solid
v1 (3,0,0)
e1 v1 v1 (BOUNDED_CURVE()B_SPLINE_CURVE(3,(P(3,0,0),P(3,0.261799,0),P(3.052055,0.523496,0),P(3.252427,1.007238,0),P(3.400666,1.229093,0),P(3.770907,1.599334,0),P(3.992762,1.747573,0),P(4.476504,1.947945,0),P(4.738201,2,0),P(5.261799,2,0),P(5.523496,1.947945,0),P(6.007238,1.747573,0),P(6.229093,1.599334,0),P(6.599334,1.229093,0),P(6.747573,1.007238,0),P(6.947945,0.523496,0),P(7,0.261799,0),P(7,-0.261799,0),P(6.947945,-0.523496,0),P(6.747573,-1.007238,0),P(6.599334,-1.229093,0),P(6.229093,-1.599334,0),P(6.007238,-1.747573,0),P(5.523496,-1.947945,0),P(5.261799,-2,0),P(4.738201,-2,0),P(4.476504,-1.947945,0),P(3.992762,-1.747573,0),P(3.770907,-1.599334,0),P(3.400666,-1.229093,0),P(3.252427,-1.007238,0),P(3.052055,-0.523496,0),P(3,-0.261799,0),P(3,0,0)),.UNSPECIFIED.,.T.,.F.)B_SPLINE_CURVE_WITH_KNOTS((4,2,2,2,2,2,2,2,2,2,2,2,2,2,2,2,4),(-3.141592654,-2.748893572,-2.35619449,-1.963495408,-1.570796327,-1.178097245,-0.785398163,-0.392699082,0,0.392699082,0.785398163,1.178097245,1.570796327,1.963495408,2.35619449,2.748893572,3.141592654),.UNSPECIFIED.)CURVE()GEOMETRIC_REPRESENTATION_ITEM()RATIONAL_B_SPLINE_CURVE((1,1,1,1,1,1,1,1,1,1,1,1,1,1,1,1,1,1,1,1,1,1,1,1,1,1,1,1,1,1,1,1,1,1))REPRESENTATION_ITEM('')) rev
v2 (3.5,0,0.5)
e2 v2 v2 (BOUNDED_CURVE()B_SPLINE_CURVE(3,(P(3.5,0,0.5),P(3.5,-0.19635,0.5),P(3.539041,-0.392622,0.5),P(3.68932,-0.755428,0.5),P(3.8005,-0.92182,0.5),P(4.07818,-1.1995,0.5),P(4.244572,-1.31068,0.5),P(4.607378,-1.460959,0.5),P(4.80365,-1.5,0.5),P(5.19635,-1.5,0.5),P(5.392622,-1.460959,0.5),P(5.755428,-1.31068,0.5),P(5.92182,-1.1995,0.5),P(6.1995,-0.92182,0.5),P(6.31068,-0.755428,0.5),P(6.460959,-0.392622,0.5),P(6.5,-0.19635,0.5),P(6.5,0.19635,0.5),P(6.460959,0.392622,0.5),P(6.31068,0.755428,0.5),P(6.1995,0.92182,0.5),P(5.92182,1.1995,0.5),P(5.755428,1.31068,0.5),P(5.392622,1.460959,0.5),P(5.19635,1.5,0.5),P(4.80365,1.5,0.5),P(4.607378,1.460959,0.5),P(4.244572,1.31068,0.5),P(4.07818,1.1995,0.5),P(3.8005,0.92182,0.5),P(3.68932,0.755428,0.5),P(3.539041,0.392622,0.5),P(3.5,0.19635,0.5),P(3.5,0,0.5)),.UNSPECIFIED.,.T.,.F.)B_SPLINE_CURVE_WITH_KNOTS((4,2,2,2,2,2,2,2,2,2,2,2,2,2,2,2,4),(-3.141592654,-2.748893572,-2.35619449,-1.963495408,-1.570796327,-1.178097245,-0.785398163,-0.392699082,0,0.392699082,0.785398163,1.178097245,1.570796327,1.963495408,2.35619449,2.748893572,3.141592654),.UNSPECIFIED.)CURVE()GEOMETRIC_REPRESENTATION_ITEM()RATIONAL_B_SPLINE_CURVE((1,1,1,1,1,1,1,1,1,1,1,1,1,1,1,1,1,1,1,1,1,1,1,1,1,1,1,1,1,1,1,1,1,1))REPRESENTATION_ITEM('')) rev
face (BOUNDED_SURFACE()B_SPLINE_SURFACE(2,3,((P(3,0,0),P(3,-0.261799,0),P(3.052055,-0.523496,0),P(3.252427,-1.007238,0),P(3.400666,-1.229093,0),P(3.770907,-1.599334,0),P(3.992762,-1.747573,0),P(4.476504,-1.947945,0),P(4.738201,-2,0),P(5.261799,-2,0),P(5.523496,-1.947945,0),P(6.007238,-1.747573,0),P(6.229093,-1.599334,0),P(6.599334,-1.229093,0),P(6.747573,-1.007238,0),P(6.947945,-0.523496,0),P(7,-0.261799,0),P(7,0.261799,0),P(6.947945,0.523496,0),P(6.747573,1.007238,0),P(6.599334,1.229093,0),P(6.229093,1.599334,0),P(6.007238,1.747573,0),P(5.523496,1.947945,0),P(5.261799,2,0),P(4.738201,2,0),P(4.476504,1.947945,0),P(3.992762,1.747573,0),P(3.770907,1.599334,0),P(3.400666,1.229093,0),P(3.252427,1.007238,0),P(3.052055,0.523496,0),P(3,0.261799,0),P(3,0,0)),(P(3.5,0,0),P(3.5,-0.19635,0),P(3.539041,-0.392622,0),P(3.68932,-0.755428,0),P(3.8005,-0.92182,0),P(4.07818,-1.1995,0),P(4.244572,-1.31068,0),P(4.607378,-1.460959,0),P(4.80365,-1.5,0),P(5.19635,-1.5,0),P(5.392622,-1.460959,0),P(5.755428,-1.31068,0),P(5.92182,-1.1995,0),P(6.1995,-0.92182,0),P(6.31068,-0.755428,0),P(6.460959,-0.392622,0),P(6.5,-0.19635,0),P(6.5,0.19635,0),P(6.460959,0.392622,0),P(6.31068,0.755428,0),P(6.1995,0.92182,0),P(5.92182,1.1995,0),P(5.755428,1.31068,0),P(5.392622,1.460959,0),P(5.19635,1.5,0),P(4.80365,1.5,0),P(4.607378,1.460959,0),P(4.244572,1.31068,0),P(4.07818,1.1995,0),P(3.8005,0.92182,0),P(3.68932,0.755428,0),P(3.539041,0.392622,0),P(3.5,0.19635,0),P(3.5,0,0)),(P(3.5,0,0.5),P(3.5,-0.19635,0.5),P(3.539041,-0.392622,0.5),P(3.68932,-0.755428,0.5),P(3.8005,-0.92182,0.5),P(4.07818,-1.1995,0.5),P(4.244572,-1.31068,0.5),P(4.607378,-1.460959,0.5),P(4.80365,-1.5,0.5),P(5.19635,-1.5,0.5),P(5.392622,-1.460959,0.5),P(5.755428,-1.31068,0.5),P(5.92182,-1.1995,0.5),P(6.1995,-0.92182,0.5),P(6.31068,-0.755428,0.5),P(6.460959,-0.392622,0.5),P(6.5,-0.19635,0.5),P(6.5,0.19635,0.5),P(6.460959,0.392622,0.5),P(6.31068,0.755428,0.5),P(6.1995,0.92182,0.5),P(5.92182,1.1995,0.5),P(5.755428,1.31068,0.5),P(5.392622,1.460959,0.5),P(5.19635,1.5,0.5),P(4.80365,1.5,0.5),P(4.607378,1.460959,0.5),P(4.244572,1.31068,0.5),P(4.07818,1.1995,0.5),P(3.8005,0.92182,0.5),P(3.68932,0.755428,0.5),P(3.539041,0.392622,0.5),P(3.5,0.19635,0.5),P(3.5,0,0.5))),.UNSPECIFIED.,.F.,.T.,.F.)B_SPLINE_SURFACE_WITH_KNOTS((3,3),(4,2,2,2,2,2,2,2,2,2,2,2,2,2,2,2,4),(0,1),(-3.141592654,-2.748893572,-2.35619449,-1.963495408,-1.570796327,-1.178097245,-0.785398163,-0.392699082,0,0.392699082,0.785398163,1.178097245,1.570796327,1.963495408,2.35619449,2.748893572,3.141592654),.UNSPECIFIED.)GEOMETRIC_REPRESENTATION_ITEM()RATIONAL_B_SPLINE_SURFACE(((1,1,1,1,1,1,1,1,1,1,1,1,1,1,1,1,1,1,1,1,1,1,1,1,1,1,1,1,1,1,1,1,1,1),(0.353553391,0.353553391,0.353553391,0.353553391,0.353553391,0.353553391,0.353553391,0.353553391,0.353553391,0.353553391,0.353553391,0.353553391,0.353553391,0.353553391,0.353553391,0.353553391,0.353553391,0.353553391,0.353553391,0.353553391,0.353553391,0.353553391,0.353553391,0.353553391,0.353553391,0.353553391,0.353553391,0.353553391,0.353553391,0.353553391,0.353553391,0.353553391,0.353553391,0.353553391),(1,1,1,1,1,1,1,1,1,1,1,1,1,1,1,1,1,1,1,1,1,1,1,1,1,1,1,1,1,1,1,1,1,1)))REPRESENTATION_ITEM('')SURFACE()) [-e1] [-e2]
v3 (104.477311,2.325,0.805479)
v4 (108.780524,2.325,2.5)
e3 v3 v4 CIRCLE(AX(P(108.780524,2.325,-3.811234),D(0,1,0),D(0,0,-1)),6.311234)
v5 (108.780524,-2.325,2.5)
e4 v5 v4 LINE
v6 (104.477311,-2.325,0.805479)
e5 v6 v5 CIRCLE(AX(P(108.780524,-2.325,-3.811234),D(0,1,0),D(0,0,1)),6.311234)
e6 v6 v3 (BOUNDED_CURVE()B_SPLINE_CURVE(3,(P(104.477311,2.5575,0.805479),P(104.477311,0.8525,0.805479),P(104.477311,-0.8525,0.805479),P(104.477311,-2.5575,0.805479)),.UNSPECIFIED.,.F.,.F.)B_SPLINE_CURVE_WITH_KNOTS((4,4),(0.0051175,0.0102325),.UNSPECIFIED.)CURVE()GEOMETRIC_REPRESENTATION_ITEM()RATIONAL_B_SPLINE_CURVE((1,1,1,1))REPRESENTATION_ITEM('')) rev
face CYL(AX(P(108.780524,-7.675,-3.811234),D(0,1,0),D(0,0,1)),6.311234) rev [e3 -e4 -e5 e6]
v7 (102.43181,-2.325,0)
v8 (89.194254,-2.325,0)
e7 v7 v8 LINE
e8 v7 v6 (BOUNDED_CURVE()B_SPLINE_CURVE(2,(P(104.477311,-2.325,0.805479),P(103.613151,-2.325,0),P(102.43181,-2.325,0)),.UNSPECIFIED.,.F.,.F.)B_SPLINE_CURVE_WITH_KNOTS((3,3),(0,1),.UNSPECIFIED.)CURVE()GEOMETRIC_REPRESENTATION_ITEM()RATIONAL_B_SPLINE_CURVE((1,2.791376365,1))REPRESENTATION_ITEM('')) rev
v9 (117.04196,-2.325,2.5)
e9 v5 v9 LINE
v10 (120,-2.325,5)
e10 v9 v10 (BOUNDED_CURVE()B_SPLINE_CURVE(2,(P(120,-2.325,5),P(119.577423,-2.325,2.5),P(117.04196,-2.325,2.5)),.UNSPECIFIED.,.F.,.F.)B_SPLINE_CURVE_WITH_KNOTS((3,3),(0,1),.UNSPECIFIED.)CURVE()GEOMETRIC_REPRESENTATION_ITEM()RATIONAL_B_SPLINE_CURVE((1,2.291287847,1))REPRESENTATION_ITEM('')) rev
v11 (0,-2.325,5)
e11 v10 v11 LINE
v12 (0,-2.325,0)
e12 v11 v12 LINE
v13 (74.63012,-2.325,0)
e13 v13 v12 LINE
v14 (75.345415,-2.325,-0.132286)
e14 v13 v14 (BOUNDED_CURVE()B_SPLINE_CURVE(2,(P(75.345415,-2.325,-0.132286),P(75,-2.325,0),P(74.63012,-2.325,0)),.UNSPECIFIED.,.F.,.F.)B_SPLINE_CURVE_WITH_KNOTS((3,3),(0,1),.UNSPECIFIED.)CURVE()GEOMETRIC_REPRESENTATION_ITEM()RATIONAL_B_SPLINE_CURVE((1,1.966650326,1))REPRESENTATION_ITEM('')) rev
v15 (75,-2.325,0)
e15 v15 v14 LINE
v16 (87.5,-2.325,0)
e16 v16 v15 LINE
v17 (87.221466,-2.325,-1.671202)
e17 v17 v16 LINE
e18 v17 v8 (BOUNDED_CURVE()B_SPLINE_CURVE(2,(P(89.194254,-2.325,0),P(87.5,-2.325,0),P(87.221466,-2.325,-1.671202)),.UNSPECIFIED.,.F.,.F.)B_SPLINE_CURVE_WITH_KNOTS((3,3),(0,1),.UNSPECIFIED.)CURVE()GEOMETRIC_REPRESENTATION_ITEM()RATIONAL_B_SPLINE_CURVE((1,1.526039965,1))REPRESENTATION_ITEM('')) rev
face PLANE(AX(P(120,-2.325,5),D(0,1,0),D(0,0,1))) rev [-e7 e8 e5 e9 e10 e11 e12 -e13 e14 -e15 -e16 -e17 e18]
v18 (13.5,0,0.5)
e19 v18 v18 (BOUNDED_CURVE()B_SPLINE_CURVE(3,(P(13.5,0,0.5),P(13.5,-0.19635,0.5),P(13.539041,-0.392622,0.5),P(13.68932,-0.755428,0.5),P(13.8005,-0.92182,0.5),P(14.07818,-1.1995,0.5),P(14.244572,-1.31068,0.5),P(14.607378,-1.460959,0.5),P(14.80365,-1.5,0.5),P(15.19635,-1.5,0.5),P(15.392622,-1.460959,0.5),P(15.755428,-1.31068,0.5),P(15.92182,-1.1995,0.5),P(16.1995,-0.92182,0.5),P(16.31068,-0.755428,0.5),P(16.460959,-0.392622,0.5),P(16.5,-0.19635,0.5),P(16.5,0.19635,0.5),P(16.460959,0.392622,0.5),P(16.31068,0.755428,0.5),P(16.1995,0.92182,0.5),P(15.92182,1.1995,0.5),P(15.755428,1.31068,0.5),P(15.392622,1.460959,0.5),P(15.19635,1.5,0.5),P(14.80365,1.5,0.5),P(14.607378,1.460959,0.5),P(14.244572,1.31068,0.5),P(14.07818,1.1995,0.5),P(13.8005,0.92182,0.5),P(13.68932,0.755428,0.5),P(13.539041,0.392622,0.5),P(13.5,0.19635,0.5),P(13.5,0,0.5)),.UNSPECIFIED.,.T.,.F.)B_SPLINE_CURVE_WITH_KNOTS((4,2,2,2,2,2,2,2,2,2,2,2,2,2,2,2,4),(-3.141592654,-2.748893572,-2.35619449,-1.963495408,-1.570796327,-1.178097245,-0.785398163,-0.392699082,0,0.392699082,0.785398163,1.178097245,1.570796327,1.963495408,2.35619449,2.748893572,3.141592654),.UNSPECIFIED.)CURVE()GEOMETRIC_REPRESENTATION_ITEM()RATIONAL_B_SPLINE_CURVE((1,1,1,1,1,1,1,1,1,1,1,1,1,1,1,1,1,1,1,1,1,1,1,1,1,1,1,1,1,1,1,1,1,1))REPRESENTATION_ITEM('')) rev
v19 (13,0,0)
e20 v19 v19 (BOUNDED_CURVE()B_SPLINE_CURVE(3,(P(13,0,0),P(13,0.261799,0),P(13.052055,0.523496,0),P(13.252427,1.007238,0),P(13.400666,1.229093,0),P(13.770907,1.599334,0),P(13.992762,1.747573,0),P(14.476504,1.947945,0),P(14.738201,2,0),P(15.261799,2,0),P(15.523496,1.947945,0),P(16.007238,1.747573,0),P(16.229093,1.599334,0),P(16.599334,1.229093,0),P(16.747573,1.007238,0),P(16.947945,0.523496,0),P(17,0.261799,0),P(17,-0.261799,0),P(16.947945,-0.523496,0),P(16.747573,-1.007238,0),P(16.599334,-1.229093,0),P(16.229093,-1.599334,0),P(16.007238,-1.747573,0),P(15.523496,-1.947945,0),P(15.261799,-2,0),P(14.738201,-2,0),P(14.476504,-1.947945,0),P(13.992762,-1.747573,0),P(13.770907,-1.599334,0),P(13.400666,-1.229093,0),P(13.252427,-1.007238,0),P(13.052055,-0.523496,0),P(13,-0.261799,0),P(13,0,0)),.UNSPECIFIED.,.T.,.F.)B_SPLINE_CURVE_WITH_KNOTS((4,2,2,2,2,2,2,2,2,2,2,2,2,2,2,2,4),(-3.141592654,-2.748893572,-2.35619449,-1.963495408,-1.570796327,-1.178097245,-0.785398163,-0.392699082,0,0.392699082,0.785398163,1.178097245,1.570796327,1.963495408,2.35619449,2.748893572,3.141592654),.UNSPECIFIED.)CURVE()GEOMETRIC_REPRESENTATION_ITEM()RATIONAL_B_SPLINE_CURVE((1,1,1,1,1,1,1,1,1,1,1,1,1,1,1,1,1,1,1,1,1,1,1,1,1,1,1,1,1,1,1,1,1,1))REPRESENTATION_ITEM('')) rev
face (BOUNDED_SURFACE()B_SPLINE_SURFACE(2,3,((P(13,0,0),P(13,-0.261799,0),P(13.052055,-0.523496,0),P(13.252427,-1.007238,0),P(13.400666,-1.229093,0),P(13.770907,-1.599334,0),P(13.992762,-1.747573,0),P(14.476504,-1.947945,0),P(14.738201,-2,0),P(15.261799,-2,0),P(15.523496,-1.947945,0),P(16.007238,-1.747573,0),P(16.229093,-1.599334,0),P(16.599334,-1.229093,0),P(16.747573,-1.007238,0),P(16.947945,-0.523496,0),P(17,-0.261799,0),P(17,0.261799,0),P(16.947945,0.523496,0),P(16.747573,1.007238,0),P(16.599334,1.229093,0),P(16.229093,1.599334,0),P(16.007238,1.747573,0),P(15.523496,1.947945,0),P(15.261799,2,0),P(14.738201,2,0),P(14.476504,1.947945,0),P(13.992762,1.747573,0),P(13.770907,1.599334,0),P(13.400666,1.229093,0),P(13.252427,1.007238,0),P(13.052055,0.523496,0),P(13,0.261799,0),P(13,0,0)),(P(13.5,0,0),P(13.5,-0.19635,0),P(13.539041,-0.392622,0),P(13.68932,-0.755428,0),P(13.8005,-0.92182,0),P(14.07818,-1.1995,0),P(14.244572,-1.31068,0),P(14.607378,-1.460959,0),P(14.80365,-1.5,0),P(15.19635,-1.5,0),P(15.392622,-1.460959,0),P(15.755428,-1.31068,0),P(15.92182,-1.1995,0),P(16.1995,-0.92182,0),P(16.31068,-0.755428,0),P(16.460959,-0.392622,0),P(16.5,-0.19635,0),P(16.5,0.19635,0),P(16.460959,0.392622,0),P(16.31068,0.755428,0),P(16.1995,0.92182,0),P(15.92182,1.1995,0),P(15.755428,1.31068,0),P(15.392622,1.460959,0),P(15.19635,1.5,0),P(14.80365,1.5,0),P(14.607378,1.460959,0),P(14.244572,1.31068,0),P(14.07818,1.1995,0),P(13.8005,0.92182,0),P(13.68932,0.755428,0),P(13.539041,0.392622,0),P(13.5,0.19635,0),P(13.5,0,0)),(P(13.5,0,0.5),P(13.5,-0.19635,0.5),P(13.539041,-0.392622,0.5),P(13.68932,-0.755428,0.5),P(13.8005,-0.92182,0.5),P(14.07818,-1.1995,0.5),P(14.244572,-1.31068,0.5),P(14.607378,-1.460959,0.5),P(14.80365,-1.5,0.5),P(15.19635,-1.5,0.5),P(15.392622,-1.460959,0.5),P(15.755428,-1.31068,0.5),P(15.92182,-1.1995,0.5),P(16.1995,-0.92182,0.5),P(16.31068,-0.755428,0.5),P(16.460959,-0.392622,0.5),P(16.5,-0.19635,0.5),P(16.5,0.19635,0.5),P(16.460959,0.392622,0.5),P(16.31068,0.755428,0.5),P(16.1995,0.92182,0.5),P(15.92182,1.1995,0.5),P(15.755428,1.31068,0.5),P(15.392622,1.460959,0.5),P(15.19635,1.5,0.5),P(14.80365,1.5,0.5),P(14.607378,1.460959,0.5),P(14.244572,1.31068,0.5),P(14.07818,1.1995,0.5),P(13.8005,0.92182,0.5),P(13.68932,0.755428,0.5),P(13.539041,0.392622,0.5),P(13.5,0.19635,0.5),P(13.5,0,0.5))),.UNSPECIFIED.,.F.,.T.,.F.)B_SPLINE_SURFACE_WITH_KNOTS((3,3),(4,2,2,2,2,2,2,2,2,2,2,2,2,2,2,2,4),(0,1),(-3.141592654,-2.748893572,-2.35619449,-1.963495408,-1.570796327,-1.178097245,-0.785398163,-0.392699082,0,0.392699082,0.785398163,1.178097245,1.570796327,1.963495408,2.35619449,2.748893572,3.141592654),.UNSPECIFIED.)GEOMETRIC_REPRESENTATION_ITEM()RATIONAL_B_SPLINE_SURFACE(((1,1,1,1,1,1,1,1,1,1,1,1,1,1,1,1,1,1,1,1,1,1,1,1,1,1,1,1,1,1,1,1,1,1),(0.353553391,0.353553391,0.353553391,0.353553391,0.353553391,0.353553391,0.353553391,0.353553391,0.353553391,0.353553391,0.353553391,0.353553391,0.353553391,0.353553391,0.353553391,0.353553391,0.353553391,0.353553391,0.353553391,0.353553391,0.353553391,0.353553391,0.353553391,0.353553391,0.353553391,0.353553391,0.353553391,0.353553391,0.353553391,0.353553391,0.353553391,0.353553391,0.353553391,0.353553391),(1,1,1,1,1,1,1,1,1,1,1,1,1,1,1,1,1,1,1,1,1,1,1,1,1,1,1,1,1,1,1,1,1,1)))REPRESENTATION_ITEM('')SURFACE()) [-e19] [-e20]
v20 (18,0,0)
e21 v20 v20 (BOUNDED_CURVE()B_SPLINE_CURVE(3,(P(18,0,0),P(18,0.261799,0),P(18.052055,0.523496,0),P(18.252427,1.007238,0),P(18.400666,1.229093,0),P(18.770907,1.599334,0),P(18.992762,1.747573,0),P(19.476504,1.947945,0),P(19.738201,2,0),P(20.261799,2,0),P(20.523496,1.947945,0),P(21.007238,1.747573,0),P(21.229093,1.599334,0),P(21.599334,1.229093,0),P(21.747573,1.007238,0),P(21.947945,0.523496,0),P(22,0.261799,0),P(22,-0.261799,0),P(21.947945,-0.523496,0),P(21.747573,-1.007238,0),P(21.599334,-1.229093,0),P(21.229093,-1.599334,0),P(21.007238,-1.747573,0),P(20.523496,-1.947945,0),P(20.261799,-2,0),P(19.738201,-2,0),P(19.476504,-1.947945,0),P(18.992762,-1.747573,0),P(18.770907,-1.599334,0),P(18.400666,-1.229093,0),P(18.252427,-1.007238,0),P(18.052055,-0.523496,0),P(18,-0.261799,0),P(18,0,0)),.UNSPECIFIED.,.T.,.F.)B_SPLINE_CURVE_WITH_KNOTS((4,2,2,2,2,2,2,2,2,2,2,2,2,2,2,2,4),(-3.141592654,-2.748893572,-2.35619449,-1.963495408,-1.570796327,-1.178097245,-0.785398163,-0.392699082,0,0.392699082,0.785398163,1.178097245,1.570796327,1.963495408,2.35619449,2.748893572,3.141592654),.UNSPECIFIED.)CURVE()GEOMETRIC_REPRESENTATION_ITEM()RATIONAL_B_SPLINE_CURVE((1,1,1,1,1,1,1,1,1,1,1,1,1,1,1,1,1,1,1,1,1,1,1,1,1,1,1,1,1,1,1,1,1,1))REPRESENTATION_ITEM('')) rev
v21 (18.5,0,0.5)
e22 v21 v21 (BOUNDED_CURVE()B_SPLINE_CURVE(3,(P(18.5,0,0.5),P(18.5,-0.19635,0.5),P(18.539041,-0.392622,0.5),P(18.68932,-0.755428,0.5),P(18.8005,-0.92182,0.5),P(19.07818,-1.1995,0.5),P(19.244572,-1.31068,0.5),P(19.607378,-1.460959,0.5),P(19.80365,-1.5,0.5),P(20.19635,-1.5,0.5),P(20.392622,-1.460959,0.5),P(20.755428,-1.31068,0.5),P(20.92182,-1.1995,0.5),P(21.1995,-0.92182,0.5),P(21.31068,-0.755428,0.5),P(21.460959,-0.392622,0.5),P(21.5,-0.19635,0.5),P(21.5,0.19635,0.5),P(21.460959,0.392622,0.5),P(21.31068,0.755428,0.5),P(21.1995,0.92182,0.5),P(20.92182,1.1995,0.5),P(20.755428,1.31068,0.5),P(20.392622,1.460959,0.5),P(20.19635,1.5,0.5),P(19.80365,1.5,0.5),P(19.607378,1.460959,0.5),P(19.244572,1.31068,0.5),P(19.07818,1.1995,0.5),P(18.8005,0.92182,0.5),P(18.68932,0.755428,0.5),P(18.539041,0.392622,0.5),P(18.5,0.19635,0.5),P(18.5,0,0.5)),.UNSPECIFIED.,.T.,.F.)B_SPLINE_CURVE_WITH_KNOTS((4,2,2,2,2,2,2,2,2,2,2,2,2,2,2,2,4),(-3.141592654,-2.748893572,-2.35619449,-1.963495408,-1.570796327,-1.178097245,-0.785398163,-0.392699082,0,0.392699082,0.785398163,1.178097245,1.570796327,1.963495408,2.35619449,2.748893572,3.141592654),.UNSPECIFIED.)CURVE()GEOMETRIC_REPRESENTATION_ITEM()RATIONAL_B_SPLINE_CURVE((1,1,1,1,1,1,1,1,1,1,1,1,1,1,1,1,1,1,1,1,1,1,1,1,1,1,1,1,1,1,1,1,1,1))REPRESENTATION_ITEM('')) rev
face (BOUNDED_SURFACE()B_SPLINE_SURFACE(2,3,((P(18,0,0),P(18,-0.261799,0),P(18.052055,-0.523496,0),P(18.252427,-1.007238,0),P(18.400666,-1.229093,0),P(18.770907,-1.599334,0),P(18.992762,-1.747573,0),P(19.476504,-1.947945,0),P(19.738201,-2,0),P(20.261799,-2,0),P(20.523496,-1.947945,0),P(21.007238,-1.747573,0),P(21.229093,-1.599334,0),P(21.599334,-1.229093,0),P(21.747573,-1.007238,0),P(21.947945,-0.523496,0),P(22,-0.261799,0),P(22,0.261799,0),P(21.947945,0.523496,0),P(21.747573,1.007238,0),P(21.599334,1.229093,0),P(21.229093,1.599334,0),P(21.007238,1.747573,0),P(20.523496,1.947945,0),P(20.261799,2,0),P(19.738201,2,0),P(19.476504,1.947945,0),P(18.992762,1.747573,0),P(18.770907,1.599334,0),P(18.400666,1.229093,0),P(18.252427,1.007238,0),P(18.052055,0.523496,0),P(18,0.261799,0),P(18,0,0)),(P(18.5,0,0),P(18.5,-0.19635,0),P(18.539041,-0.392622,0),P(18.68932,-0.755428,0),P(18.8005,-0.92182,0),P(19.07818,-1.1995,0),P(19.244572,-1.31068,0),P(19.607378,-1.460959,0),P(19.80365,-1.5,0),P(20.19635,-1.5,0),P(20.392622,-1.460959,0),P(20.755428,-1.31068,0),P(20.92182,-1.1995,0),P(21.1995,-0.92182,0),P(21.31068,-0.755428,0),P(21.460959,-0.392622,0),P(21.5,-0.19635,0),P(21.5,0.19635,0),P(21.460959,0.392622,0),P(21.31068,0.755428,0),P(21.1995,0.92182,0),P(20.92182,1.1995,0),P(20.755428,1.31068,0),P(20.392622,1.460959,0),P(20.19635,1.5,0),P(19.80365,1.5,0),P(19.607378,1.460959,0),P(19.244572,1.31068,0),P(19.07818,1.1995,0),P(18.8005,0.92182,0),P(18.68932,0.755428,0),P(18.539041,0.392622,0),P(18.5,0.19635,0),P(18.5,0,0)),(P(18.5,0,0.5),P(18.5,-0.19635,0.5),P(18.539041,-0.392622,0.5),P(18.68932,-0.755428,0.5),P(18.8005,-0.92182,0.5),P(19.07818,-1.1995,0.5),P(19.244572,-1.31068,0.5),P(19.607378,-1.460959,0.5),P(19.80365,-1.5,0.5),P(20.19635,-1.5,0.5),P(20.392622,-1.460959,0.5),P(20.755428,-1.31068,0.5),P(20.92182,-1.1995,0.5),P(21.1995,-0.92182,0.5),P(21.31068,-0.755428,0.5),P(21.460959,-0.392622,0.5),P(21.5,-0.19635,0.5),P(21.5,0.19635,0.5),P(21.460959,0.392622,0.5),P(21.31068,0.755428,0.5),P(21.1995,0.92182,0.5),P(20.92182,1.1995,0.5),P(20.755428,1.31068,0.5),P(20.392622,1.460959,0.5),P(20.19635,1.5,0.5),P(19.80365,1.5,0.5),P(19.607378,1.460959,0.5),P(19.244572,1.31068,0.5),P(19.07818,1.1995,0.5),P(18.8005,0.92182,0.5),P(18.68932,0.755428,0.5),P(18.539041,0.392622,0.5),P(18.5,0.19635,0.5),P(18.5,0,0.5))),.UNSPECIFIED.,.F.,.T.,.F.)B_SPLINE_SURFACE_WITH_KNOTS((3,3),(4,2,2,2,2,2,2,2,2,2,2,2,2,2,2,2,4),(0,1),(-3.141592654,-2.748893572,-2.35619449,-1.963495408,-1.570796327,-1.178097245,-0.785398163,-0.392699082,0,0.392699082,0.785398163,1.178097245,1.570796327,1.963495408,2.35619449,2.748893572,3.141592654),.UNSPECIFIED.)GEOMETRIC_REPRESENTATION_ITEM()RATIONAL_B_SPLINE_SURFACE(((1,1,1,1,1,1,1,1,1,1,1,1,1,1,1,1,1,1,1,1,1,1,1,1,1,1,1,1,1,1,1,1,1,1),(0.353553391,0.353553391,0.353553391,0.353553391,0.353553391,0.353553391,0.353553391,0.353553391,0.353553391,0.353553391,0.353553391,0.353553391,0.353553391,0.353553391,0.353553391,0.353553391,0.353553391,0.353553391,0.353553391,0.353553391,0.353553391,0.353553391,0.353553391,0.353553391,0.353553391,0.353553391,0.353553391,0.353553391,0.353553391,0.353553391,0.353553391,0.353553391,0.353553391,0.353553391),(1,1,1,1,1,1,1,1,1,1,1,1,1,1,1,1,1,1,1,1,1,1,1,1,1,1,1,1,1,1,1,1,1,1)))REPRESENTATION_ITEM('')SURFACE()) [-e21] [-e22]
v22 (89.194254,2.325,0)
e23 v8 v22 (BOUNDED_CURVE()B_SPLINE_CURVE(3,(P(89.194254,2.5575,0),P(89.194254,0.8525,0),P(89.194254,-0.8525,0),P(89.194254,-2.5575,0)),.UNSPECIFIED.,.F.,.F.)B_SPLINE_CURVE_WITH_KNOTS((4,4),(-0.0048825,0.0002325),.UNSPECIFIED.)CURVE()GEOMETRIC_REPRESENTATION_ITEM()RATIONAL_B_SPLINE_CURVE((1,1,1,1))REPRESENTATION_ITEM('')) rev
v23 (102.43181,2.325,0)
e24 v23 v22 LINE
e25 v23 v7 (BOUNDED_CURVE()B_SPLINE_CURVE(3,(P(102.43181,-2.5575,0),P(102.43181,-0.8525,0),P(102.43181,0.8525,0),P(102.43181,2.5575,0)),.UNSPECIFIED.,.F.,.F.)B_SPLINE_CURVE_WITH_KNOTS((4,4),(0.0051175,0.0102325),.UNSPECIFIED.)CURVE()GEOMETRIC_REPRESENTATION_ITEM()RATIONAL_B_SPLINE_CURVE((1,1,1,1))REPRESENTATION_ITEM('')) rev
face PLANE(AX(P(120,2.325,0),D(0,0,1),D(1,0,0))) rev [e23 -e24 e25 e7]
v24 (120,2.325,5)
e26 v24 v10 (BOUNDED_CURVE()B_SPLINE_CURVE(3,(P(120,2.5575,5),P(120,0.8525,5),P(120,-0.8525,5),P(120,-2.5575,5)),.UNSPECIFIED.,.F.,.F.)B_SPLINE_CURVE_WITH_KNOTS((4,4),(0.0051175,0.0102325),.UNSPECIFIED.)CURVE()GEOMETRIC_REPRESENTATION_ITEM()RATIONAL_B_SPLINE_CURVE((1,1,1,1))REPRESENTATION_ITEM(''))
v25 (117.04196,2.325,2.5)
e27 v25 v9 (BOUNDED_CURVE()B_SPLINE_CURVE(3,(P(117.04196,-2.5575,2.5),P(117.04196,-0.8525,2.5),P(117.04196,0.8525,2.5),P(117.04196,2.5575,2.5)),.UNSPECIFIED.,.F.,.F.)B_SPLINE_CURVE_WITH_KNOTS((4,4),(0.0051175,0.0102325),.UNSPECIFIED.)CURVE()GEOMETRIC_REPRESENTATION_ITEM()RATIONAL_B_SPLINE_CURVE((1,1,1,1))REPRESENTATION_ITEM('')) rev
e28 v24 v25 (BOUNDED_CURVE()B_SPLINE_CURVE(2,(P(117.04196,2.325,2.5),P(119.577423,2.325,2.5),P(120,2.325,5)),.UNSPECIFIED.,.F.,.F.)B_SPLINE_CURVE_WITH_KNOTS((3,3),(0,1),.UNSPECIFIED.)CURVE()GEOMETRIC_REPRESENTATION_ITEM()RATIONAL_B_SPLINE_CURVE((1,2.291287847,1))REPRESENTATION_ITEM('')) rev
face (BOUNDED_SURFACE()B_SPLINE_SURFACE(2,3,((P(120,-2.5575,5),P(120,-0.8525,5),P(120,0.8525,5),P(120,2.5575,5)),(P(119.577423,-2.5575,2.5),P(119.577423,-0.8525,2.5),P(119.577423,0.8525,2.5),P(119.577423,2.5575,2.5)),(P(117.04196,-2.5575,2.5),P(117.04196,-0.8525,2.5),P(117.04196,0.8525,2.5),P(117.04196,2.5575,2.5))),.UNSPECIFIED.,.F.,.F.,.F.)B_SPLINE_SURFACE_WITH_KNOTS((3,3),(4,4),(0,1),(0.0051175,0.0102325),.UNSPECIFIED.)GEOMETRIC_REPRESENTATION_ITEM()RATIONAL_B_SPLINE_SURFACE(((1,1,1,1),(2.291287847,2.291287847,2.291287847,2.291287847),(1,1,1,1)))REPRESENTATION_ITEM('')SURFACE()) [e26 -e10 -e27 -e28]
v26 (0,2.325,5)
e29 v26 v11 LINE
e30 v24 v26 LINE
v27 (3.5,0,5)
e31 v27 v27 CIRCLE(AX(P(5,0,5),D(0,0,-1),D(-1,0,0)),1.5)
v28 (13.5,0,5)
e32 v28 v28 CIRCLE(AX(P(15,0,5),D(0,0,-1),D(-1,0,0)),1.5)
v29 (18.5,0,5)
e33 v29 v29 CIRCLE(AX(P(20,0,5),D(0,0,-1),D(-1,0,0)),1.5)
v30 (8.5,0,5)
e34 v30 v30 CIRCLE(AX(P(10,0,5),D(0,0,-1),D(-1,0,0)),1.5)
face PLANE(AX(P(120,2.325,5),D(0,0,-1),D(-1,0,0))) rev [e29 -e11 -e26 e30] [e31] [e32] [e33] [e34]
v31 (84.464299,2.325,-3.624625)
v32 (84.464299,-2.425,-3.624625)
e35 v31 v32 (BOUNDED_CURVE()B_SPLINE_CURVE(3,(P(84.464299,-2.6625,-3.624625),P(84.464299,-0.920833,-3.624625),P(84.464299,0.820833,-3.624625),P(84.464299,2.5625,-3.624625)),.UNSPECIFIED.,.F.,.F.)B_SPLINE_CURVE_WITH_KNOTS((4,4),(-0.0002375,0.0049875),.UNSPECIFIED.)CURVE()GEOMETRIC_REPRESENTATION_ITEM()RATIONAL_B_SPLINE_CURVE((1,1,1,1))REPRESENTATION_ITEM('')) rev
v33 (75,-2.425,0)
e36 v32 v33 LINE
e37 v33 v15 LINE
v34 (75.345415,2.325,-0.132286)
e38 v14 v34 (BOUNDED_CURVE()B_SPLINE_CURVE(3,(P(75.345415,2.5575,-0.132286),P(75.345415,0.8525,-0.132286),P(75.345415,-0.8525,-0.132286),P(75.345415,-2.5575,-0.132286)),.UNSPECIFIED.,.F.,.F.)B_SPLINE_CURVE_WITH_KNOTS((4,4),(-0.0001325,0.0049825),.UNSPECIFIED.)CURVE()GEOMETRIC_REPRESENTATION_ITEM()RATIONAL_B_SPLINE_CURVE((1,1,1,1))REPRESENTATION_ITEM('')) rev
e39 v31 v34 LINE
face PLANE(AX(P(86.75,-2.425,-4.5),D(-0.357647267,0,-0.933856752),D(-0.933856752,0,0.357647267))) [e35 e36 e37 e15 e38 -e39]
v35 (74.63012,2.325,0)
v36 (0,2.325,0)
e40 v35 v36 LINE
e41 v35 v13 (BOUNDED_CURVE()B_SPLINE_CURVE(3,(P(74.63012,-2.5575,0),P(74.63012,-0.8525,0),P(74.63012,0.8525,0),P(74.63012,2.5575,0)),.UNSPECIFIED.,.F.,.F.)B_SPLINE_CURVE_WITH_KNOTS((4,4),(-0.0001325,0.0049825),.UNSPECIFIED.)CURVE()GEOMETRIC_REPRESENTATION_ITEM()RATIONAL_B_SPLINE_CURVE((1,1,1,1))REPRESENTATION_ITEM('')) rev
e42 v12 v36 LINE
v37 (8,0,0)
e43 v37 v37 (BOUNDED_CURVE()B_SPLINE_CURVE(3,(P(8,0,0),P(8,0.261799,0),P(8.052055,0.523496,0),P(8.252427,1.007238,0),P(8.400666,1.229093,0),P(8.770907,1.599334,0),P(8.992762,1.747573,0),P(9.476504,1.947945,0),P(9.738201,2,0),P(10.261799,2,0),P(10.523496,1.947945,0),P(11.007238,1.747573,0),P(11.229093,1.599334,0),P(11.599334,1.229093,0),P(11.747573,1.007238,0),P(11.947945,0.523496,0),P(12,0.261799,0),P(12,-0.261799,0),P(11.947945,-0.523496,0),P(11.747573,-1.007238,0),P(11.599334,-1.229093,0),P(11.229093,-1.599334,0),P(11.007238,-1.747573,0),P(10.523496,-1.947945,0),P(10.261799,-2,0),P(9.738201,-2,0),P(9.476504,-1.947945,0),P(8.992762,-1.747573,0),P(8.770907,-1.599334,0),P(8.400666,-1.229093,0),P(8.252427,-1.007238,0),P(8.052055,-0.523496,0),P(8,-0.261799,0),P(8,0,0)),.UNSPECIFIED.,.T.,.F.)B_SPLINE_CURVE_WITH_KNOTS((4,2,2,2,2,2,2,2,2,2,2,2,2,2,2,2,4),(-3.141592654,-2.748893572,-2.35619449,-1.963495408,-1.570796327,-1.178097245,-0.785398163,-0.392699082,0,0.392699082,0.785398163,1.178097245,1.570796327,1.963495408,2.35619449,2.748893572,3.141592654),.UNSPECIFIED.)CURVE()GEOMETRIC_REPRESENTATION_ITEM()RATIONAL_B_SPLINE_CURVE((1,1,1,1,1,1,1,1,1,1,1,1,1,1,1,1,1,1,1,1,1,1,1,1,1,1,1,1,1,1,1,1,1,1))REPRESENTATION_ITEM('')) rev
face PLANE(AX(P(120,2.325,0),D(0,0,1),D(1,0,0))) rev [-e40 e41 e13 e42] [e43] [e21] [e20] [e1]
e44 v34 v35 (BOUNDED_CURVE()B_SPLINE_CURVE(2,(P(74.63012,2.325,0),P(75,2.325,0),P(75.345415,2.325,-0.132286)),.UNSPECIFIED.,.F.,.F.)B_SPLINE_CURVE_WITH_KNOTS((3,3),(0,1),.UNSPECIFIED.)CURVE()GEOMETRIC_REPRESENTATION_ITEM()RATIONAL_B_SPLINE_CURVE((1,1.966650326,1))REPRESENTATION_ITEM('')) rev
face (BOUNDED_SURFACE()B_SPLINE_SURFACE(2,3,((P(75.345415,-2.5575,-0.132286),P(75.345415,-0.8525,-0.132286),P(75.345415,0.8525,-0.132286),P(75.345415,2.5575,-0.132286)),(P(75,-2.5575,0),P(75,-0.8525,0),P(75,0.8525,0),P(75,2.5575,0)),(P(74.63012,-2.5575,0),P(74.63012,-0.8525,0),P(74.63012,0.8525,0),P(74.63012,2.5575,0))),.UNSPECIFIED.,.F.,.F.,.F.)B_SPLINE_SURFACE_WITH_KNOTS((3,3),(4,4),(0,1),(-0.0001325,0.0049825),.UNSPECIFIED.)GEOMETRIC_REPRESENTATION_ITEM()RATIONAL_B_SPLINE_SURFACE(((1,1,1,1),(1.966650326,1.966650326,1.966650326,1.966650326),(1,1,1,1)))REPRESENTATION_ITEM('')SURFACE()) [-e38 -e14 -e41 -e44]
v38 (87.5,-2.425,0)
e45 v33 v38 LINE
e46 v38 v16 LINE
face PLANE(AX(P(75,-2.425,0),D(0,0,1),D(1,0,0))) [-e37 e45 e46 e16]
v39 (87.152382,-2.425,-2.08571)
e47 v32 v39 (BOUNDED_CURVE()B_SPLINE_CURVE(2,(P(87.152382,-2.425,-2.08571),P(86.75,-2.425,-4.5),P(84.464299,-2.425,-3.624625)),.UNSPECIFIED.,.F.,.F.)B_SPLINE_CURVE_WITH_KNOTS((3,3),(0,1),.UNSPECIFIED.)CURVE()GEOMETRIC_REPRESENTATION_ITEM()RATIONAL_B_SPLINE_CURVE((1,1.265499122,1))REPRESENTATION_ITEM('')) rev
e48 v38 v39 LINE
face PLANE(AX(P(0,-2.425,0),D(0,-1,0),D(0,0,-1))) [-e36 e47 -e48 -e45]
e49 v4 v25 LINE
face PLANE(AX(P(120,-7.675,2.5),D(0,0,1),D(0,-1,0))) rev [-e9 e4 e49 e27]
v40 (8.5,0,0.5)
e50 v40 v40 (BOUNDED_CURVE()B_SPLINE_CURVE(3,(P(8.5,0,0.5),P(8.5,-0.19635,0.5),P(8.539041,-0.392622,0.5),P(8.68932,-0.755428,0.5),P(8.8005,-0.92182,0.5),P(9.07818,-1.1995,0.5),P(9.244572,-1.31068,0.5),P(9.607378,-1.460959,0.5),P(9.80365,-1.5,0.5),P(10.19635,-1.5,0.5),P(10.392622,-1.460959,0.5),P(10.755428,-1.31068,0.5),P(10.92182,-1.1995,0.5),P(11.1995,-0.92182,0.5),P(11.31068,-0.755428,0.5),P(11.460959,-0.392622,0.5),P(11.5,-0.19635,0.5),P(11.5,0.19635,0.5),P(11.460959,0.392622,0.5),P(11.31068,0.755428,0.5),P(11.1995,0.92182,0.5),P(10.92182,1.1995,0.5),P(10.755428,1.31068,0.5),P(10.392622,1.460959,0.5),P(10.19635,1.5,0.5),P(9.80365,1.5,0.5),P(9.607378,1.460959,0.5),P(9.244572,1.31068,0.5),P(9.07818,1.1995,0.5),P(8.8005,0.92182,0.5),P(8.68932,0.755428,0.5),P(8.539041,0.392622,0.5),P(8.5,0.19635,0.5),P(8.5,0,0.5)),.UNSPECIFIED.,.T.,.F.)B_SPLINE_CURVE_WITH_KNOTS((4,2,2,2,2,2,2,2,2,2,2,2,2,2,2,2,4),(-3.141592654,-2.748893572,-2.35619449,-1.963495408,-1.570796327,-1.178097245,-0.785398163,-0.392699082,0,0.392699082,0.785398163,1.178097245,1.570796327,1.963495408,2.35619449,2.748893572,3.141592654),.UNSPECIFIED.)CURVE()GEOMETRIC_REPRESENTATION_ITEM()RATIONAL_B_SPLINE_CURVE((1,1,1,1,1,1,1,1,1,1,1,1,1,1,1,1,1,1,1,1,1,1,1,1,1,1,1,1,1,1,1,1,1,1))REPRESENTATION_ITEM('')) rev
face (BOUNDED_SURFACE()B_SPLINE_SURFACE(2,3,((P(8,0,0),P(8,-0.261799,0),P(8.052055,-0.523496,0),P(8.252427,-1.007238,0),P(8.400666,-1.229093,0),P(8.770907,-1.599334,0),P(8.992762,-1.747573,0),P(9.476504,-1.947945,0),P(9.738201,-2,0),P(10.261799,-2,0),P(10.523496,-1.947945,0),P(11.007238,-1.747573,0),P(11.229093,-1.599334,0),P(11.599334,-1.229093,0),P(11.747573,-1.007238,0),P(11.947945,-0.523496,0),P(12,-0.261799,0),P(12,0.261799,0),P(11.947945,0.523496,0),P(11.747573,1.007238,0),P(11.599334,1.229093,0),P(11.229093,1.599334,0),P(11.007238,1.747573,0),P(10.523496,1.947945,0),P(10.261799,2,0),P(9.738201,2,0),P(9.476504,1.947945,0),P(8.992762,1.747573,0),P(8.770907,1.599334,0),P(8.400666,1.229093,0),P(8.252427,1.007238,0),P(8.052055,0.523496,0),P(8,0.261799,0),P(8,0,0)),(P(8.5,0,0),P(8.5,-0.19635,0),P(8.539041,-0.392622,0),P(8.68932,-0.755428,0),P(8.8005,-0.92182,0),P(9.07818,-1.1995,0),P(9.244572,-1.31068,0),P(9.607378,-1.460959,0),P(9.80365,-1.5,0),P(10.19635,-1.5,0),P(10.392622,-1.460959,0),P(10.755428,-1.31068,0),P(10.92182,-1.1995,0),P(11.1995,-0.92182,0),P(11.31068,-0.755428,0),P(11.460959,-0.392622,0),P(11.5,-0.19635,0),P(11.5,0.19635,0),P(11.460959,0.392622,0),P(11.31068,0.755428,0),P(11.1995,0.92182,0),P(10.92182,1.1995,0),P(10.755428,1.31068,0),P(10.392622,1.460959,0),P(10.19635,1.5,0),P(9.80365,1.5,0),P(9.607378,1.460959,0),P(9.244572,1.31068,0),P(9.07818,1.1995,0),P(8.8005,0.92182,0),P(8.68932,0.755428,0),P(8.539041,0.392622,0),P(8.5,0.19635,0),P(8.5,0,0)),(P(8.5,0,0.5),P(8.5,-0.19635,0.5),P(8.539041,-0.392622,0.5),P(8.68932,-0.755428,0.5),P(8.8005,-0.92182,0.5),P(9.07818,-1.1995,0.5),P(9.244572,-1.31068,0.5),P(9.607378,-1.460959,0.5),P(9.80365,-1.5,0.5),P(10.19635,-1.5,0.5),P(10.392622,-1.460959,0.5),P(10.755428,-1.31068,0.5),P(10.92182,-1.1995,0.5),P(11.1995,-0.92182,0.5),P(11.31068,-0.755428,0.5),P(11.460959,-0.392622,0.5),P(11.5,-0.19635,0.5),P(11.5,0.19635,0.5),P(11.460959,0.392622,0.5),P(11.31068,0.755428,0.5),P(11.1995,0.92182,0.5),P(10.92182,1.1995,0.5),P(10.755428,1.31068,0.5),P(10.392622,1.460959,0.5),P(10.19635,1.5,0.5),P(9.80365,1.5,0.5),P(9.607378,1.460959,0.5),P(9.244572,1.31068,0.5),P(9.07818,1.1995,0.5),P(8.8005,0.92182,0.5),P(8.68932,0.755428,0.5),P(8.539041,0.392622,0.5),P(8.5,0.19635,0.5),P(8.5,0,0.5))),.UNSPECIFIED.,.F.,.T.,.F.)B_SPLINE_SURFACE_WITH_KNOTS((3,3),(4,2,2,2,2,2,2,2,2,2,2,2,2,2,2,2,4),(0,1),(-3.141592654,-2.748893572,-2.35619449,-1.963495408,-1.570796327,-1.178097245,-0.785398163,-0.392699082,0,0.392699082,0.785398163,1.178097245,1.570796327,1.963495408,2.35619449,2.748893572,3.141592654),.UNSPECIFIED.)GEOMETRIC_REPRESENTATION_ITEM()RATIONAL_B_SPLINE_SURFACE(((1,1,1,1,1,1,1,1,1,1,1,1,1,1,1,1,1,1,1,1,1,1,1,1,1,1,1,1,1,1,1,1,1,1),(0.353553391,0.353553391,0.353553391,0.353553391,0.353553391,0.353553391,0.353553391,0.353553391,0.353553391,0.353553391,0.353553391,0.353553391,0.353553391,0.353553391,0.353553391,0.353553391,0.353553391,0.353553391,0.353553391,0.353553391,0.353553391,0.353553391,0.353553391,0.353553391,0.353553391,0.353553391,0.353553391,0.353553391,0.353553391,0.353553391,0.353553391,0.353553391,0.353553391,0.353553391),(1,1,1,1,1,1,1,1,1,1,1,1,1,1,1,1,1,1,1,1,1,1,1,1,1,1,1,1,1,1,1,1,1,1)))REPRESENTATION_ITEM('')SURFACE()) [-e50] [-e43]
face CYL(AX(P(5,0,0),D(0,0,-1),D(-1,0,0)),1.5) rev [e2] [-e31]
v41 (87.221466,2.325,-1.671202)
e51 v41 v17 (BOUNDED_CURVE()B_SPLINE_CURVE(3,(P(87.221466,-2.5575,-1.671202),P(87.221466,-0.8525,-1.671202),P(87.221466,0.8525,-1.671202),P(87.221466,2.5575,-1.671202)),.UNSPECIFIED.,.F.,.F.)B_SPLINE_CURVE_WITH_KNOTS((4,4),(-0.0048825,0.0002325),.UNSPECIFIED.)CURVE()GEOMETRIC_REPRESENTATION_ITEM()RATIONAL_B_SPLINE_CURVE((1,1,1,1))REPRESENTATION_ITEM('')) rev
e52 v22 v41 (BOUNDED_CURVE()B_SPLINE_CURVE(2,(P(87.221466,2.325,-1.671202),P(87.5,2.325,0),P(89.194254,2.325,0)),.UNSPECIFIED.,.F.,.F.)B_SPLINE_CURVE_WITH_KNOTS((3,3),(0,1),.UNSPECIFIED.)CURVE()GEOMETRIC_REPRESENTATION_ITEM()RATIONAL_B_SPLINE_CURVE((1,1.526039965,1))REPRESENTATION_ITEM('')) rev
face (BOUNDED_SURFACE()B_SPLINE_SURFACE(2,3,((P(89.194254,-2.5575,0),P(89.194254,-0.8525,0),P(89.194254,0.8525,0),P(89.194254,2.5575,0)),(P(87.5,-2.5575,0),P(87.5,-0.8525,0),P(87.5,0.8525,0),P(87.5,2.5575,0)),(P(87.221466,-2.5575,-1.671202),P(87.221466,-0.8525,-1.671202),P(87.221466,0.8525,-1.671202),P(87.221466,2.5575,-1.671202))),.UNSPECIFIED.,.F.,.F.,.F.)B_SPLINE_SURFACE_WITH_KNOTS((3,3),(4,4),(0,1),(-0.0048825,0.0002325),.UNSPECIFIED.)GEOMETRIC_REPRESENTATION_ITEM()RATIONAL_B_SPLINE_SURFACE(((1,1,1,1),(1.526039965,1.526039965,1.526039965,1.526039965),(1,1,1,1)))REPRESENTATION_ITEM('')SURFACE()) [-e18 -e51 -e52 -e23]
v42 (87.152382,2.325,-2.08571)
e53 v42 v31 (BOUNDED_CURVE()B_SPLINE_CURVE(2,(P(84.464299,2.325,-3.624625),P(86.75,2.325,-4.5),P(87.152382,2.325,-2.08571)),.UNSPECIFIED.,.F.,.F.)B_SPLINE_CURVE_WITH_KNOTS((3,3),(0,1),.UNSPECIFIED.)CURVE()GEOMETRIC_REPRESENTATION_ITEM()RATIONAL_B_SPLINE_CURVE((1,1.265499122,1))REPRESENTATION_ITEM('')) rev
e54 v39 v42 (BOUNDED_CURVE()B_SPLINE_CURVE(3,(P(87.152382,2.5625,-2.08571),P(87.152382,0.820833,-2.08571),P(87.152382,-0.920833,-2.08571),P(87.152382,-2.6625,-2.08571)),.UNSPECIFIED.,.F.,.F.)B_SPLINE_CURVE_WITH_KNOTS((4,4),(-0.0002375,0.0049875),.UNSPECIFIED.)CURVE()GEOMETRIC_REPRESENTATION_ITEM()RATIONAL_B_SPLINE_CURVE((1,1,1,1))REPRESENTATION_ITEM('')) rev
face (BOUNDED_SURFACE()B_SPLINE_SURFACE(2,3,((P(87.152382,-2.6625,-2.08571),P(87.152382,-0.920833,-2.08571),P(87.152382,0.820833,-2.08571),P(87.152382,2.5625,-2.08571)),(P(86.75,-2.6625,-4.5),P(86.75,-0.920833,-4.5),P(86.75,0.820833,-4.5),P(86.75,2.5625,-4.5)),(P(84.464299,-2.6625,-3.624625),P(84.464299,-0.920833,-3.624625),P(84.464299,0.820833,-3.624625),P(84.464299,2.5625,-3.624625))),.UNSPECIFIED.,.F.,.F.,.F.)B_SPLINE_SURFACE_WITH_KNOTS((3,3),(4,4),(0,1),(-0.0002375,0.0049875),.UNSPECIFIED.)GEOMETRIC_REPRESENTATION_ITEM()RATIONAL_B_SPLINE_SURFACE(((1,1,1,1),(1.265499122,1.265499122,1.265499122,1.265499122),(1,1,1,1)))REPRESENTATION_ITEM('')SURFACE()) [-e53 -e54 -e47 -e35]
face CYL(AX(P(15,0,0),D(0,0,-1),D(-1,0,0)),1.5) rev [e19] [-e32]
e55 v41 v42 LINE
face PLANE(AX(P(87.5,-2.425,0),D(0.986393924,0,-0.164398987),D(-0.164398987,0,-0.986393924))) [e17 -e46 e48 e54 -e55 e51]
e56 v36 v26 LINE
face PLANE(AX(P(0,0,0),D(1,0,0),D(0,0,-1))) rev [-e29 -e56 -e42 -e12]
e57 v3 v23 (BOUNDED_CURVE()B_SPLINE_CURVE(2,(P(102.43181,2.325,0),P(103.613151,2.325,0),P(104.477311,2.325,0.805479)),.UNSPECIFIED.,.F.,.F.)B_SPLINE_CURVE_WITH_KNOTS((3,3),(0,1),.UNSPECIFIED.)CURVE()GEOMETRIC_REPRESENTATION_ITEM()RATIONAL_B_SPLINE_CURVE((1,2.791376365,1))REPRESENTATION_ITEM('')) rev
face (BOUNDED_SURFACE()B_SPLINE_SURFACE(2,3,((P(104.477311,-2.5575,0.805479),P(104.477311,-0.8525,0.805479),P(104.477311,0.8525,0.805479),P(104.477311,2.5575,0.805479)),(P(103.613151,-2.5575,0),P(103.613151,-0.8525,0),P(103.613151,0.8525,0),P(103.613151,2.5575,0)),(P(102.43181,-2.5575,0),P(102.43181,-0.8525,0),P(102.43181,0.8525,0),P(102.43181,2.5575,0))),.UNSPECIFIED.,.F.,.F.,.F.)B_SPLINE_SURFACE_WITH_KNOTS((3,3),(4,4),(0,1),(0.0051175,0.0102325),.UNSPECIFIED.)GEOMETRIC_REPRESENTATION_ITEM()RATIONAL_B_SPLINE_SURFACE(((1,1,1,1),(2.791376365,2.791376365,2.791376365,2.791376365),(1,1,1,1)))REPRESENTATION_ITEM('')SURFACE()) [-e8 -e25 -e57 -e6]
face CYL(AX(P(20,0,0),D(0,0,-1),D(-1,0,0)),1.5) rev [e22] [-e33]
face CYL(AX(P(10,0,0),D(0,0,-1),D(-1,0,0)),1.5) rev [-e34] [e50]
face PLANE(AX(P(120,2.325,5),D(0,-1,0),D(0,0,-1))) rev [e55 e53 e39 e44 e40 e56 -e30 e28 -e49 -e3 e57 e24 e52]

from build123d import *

# Parameters (mm, degrees)
ESBO_O1_W                = 5
ESBO_O1_H                = 4.65
RESSALTO_EXTRUS_O1_DEPTH = 120
RESSALTO_EXTRUS_O2_DEPTH = 4.75
F_3_0MM_DOWEL_HOLE3_D    = 3
CUT_EXTRUDE2_DEPTH       = 10
FILLET4_START            = -3
FILLET4_DEPTH            = 6
FILLET1_SIZE             = 0.5
FILLET6_START            = -2.325
FILLET6_DEPTH            = 4.65
FILLET7_START            = -2.325
FILLET7_DEPTH            = 4.65


with BuildPart() as part:
    # Esboço1 → Ressalto-extrusão1 (new body)
    with BuildSketch(Plane(origin=(0, 0, 0), x_dir=(0, 0, -1), z_dir=(1, 0, 0))):
        with Locations((-2.5, 0)):
            Rectangle(ESBO_O1_W, ESBO_O1_H)
    extrude(amount=RESSALTO_EXTRUS_O1_DEPTH)

    # Esboço2 → Ressalto-extrusão2 (add)
    with BuildSketch(Plane(origin=(0, 2.325, 0), x_dir=(1, 0, 0), z_dir=(0, 1, 0))):
        Polygon((75, 0), (87.5, 0), (86.75, 4.5), align=None)
    extrude(amount=-RESSALTO_EXTRUS_O2_DEPTH)

    # Ø3.0mm Dowel Hole3 (through all)
    with Locations(Plane(origin=(0, 0, 0), x_dir=(-1, 0, 0), z_dir=(0, 0, -1))):
        with Locations((-5, 0), (-10, 0), (-15, 0), (-20, 0)):
            Hole(F_3_0MM_DOWEL_HOLE3_D / 2)

    # Sketch12 → Cut-Extrude2 (cut)
    with BuildSketch(Plane(origin=(0, 2.325, 0), x_dir=(1, 0, 0), z_dir=(0, 1, 0))):
        with BuildLine():
            Line((120, -2.5), (108.780523662, -2.5))
            ThreePointArc((108.780523662, -2.5), (105.971779801, -1.840547319), (103.75, 0))
            Line((103.75, 0), (120, 0))
            Line((120, 0), (120, -2.5))
        make_face()
    extrude(amount=-CUT_EXTRUDE2_DEPTH, mode=Mode.SUBTRACT)

    # Fillet4: read off the stored shape, not the designer's step
    # Fillet4 outline → Fillet4 (cut)
    with BuildSketch(Plane(origin=(0, 0, 0), x_dir=(1, 0, 0), z_dir=(0, 1, 0)).offset(FILLET4_START)):
        with BuildLine():
            add(Edge.make_bspline(
                [(104.477311177, -0.805478659), (103.613151376, 0), (102.431809752, 0)],
                knots=[0, 0, 0, 1, 1, 1], degree=2, weights=[1, 2.791376365, 1]))
            ThreePointArc((104.477311177, -0.805478659), (104.096310112, -0.418401518), (103.75, 0))
            Line((103.75, 0), (102.431809752, 0))
        make_face()
        with BuildLine():
            Line((120, -2.5), (117.041960108, -2.5))
            add(Edge.make_bspline(
                [(120, -5), (119.577422873, -2.5), (117.041960108, -2.5)],
                knots=[0, 0, 0, 1, 1, 1], degree=2, weights=[1, 2.291287847, 1]))
            Line((120, -5), (120, -2.5))
        make_face()
    extrude(amount=FILLET4_DEPTH, mode=Mode.SUBTRACT)

    # Fillet1
    # a fillet whose section is not a circle: 0.5 mm, written as the material it takes off along each edge
    with BuildSketch(Plane(origin=(20, 0, 0), x_dir=(1, 0, 0), z_dir=(0, -1, 0))) as fillet1_piece_1:
        with BuildLine():
            Bezier((1.5 + FILLET1_SIZE, 0), (1.5, 0), (1.5, FILLET1_SIZE), weights=[1, 0.353553391, 1])
            Line((1.5, FILLET1_SIZE), (1.5 - FILLET1_SIZE * 0.02, FILLET1_SIZE))
            Line((1.5 - FILLET1_SIZE * 0.02, FILLET1_SIZE), (1.5 - FILLET1_SIZE * 0.02, -FILLET1_SIZE * 0.02))
            Line((1.5 - FILLET1_SIZE * 0.02, -FILLET1_SIZE * 0.02), (1.5 + FILLET1_SIZE, -FILLET1_SIZE * 0.02))
            Line((1.5 + FILLET1_SIZE, -FILLET1_SIZE * 0.02), (1.5 + FILLET1_SIZE, 0))
        make_face()
    revolve(axis=Axis((20, 0, 0), (0, 0, 1)), mode=Mode.SUBTRACT)
    with BuildSketch(Plane(origin=(15, 0, 0), x_dir=(1, 0, 0), z_dir=(0, -1, 0))) as fillet1_piece_2:
        with BuildLine():
            Bezier((1.5 + FILLET1_SIZE, 0), (1.5, 0), (1.5, FILLET1_SIZE), weights=[1, 0.353553391, 1])
            Line((1.5, FILLET1_SIZE), (1.5 - FILLET1_SIZE * 0.02, FILLET1_SIZE))
            Line((1.5 - FILLET1_SIZE * 0.02, FILLET1_SIZE), (1.5 - FILLET1_SIZE * 0.02, -FILLET1_SIZE * 0.02))
            Line((1.5 - FILLET1_SIZE * 0.02, -FILLET1_SIZE * 0.02), (1.5 + FILLET1_SIZE, -FILLET1_SIZE * 0.02))
            Line((1.5 + FILLET1_SIZE, -FILLET1_SIZE * 0.02), (1.5 + FILLET1_SIZE, 0))
        make_face()
    revolve(axis=Axis((15, 0, 0), (0, 0, 1)), mode=Mode.SUBTRACT)
    with BuildSketch(Plane(origin=(10, 0, 0), x_dir=(1, 0, 0), z_dir=(0, -1, 0))) as fillet1_piece_3:
        with BuildLine():
            Bezier((1.5 + FILLET1_SIZE, 0), (1.5, 0), (1.5, FILLET1_SIZE), weights=[1, 0.353553391, 1])
            Line((1.5, FILLET1_SIZE), (1.5 - FILLET1_SIZE * 0.02, FILLET1_SIZE))
            Line((1.5 - FILLET1_SIZE * 0.02, FILLET1_SIZE), (1.5 - FILLET1_SIZE * 0.02, -FILLET1_SIZE * 0.02))
            Line((1.5 - FILLET1_SIZE * 0.02, -FILLET1_SIZE * 0.02), (1.5 + FILLET1_SIZE, -FILLET1_SIZE * 0.02))
            Line((1.5 + FILLET1_SIZE, -FILLET1_SIZE * 0.02), (1.5 + FILLET1_SIZE, 0))
        make_face()
    revolve(axis=Axis((10, 0, 0), (0, 0, 1)), mode=Mode.SUBTRACT)
    with BuildSketch(Plane(origin=(5, 0, 0), x_dir=(1, 0, 0), z_dir=(0, -1, 0))) as fillet1_piece_4:
        with BuildLine():
            Bezier((1.5 + FILLET1_SIZE, 0), (1.5, 0), (1.5, FILLET1_SIZE), weights=[1, 0.353553391, 1])
            Line((1.5, FILLET1_SIZE), (1.5 - FILLET1_SIZE * 0.02, FILLET1_SIZE))
            Line((1.5 - FILLET1_SIZE * 0.02, FILLET1_SIZE), (1.5 - FILLET1_SIZE * 0.02, -FILLET1_SIZE * 0.02))
            Line((1.5 - FILLET1_SIZE * 0.02, -FILLET1_SIZE * 0.02), (1.5 + FILLET1_SIZE, -FILLET1_SIZE * 0.02))
            Line((1.5 + FILLET1_SIZE, -FILLET1_SIZE * 0.02), (1.5 + FILLET1_SIZE, 0))
        make_face()
    revolve(axis=Axis((5, 0, 0), (0, 0, 1)), mode=Mode.SUBTRACT)

    # Fillet5
    # a fillet whose section is not a circle: 2 mm, written as the material it takes off along each edge
    with BuildSketch(Plane(origin=(86.75, 8.443980956, -4.5), x_dir=(-0.9338567516961642, 0, 0.35764726660704255), z_dir=(0, -1, 0))) as fillet5_piece_1:
        with BuildLine():
            Bezier((2.447592383, 0), (0, 0), (0.487697434, -2.398511973), weights=[1, 1.265499122, 1])
            Line((0.487697434, -2.398511973), (0, 0))
            Line((0, 0), (2.447592383, 0))
        make_face()
    extrude(amount=16.987961913, mode=Mode.SUBTRACT)

    # Fillet6: read off the stored shape, not the designer's step
    # Fillet6 outline → Fillet6 (add)
    with BuildSketch(Plane(origin=(0, 0, 0), x_dir=(1, 0, 0), z_dir=(0, 1, 0)).offset(FILLET6_START)):
        with BuildLine():
            Line((75, 0), (75.345414741, 0.132286497))
            add(Edge.make_bspline(
                [(75.345414741, 0.132286497), (75, 0), (74.630120208, 0)],
                knots=[0, 0, 0, 1, 1, 1], degree=2, weights=[1, 1.966650326, 1]))
            Line((74.630120208, 0), (75, 0))
        make_face()
    extrude(amount=FILLET6_DEPTH)

    # Fillet7: read off the stored shape, not the designer's step
    # Fillet7 outline → Fillet7 (add)
    with BuildSketch(Plane(origin=(0, 0, 0), x_dir=(1, 0, 0), z_dir=(0, 1, 0)).offset(FILLET7_START)):
        with BuildLine():
            Line((87.5, 0), (89.194254177, 0))
            add(Edge.make_bspline(
                [(89.194254177, 0), (87.5, 0), (87.221466329, 1.671202025)],
                knots=[0, 0, 0, 1, 1, 1], degree=2, weights=[1, 1.526039965, 1]))
            Line((87.221466329, 1.671202025), (87.5, 0))
        make_face()
    extrude(amount=FILLET7_DEPTH)


solid = part.part
